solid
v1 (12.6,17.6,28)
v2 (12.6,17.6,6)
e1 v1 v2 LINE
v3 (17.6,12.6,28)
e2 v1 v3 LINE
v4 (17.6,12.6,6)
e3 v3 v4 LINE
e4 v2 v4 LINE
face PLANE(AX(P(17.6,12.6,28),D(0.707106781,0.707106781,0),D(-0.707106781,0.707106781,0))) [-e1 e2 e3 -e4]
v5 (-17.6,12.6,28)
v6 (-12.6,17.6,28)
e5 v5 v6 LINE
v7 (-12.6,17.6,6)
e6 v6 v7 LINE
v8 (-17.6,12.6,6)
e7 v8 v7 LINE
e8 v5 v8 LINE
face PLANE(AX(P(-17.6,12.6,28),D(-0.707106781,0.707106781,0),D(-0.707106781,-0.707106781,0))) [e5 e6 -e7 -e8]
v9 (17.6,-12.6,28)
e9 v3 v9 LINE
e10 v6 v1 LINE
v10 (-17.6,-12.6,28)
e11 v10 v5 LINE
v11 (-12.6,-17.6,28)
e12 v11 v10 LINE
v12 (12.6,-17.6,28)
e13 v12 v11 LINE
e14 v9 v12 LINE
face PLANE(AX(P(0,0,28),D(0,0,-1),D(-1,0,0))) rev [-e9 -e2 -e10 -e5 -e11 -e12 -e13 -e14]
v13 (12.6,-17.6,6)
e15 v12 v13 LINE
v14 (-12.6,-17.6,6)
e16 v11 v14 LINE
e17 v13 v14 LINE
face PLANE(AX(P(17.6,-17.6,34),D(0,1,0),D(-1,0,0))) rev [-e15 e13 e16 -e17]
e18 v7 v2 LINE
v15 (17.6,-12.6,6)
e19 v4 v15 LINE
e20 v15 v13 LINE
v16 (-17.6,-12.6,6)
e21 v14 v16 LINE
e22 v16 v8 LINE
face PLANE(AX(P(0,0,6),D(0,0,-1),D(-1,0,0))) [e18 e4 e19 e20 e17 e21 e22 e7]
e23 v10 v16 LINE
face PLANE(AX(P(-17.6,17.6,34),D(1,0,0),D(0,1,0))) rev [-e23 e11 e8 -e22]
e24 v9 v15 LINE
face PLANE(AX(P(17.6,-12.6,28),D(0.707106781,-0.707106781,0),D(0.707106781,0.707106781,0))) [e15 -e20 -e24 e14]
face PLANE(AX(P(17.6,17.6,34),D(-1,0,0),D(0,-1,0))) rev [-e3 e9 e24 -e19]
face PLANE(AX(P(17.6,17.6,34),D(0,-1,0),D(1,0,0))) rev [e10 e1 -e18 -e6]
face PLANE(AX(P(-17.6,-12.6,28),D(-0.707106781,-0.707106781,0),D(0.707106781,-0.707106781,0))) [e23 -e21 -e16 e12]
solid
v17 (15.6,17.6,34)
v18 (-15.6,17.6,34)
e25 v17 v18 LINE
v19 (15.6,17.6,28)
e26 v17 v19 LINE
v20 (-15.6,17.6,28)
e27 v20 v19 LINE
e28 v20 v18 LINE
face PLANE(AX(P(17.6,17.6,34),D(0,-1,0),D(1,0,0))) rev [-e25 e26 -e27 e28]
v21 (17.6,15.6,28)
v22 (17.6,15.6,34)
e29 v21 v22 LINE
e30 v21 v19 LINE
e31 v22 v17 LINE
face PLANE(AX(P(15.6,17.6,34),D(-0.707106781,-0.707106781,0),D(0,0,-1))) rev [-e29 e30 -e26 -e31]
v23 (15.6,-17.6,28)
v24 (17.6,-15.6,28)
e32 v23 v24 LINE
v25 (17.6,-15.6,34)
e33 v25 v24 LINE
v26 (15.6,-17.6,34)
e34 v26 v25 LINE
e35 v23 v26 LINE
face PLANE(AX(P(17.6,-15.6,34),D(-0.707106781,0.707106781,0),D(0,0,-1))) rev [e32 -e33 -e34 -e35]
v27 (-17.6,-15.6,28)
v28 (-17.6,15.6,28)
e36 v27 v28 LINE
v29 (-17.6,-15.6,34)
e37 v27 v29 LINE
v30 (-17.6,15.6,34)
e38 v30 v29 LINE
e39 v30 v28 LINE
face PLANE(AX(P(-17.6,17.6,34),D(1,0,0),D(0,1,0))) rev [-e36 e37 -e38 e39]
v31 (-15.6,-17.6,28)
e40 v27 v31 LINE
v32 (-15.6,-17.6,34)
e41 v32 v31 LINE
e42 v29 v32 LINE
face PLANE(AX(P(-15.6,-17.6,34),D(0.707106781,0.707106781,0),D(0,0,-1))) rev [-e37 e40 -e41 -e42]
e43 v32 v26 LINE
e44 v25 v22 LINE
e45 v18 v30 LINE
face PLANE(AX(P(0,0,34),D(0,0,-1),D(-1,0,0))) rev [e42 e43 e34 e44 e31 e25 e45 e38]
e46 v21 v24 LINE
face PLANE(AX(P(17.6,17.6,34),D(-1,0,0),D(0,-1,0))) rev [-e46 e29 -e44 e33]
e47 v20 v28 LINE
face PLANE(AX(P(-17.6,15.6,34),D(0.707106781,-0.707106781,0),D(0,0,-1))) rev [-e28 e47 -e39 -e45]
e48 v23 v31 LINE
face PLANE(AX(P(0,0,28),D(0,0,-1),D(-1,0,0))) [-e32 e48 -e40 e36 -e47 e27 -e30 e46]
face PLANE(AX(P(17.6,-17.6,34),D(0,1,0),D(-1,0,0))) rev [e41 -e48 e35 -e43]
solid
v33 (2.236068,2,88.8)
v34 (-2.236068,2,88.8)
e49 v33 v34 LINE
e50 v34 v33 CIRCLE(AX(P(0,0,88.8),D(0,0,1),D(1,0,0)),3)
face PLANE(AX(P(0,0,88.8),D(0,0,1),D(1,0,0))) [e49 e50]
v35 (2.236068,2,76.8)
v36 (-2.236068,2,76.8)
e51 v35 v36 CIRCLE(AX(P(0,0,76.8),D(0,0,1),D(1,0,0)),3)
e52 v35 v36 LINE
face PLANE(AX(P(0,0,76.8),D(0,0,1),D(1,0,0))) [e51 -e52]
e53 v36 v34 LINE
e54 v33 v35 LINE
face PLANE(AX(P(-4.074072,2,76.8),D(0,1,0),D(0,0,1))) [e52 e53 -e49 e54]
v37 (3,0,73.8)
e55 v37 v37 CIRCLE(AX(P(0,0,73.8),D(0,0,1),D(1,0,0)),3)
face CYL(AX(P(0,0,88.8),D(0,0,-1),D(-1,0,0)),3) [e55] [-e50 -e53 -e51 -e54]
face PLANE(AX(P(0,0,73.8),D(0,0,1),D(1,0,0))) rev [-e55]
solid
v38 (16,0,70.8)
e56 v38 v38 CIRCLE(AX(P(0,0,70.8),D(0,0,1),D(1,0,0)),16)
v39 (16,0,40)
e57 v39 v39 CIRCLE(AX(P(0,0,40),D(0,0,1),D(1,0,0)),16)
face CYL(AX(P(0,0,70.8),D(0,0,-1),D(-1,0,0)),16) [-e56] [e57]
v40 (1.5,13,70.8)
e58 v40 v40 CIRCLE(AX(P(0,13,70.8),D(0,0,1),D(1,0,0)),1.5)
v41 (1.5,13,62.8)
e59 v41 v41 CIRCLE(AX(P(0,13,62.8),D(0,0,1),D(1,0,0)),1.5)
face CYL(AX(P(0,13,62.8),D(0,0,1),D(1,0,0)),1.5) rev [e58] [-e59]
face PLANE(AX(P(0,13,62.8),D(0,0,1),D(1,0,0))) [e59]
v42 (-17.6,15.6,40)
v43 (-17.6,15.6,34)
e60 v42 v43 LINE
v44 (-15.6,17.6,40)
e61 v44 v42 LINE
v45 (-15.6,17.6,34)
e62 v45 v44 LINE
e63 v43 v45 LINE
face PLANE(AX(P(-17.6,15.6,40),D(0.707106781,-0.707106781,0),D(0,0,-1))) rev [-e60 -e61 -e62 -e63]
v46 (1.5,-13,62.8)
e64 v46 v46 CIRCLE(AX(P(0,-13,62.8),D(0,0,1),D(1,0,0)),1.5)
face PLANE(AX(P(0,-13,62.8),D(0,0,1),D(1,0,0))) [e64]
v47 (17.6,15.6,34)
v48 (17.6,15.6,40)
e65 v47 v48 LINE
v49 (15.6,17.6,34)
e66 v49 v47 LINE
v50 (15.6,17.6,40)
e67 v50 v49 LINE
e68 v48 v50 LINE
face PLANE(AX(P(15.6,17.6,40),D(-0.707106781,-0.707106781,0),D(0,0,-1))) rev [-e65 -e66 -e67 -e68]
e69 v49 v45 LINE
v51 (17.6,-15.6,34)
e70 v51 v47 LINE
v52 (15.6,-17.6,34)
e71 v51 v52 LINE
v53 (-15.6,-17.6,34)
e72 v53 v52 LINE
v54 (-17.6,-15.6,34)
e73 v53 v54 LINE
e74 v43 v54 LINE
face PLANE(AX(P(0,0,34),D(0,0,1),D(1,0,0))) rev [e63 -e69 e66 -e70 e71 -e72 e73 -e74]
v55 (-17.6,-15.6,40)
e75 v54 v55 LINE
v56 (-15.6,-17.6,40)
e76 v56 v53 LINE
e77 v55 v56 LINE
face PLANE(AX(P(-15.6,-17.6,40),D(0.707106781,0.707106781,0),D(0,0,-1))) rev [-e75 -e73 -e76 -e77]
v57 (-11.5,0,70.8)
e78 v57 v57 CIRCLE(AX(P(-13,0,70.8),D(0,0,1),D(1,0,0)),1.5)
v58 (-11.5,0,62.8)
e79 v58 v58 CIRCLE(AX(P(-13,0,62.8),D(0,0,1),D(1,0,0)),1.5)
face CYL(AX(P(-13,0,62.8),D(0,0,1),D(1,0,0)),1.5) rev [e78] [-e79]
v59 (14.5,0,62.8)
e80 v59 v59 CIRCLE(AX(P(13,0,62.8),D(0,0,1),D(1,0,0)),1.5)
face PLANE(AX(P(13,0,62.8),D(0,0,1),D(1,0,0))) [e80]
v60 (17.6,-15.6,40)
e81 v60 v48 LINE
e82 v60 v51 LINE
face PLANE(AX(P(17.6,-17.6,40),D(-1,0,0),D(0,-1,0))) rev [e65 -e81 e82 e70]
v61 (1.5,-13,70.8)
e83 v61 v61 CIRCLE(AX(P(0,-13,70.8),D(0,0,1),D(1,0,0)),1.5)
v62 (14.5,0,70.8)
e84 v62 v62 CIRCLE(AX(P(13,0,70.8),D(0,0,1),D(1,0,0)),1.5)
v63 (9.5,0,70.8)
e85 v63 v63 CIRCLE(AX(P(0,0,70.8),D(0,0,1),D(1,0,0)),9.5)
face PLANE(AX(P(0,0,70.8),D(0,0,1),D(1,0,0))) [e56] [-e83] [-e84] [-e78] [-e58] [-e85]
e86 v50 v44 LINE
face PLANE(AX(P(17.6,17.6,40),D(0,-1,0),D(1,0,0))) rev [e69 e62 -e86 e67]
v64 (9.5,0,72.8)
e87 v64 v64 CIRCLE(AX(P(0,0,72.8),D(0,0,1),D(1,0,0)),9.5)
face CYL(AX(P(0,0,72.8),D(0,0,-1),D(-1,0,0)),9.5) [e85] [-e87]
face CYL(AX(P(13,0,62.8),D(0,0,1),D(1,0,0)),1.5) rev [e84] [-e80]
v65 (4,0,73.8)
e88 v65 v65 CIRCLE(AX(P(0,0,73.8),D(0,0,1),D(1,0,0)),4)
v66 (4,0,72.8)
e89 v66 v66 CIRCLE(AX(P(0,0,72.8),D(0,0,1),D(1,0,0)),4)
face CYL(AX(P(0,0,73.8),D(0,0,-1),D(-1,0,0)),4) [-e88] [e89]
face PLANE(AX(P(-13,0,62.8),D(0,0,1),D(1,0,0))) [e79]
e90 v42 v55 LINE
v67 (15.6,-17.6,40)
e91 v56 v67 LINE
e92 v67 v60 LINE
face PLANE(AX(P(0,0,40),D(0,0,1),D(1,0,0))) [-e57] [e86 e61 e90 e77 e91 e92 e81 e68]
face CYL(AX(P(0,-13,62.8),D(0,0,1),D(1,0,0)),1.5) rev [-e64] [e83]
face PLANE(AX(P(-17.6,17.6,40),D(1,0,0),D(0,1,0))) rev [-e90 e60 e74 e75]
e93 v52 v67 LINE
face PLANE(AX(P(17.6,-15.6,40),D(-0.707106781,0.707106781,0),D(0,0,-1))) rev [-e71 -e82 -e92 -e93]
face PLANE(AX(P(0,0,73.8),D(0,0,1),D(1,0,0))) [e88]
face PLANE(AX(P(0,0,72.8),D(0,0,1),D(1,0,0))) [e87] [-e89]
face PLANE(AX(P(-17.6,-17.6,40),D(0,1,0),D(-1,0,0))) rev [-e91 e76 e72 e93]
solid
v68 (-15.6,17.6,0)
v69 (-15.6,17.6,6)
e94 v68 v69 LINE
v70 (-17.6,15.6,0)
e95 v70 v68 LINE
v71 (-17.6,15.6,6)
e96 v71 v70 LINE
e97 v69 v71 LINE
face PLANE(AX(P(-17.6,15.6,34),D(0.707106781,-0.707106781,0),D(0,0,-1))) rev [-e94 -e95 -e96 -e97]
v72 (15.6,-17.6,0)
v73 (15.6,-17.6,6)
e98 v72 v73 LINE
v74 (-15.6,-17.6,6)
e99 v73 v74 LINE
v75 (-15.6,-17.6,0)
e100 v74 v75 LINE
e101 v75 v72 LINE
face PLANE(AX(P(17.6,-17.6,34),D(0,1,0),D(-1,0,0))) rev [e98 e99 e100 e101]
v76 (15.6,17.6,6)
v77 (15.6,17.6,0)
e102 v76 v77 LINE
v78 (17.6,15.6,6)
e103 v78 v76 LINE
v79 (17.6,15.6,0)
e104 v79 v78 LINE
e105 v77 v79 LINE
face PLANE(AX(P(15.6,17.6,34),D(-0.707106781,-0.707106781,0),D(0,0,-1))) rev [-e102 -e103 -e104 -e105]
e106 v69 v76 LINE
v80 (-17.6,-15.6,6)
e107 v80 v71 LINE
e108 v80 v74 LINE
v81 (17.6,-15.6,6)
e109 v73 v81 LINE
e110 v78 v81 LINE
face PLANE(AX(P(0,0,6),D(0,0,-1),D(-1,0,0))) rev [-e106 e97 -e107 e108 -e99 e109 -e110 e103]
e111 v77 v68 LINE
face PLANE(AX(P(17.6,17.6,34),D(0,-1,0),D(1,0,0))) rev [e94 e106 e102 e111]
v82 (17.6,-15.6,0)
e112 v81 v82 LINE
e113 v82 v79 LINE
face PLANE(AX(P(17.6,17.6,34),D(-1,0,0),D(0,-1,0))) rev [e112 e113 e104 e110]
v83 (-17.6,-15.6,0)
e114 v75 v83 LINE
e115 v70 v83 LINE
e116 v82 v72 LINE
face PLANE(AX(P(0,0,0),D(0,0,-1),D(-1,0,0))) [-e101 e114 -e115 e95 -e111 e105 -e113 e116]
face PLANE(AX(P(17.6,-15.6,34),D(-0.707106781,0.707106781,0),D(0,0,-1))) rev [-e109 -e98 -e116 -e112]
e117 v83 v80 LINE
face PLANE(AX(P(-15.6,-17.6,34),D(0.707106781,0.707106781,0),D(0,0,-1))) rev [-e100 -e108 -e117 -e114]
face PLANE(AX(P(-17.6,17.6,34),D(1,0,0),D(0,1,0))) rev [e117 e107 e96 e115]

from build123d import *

# Parameters (mm, degrees)
ESQUISSE1_W             = 35.2
ESQUISSE1_H             = 35.2
BOSS_EXTRU_1_DEPTH      = 34
ESQUISSE2_W             = 35.2
ESQUISSE2_H             = 35.2
BOSS_EXTRU_2_DEPTH      = 6
ESQUISSE3_R             = 16
BOSS_EXTRU_3_DEPTH      = 30.8
ESQUISSE4_R             = 9.5
BOSS_EXTRU_4_DEPTH      = 2
ESQUISSE5_R             = 4
BOSS_EXTRU_5_DEPTH      = 1
ESQUISSE6_R             = 3
BOSS_EXTRU_6_DEPTH      = 15
ESQUISSE7_OUTSIDE_W     = 57.56
ESQUISSE7_OUTSIDE_H     = 57.56
ESQUISSE7_OUTSIDE_W_2   = 8.389084627
ESQUISSE7_OUTSIDE_H_2   = 5
ENL_V_MAT_EXTRU_1_DEPTH = 12
ESQUISSE8_R             = 1.5
ENL_V_MAT_EXTRU_2_DEPTH = 8
CHANFREIN1_SIZE         = 2
CHANFREIN2_SIZE         = 2
ESQUISSE9_OUTSIDE_W     = 57.56
ESQUISSE9_OUTSIDE_H     = 57.56
ENL_V_MAT_EXTRU_3_DEPTH = 22


# Read off the part's stored shape, not the designer's step: Intersect1, Intersect2
with BuildPart() as part:
    # Esquisse1 → Boss.-Extru.1 (new body)
    with BuildSketch(Plane.XY):
        Rectangle(ESQUISSE1_W, ESQUISSE1_H)
    extrude(amount=BOSS_EXTRU_1_DEPTH)

    # Chanfrein1
    chanfrein1_edges = [part.edges().sort_by_distance(p)[0] for p in [
        (-17.6, 17.6, 17),
        (17.6, 17.6, 17),
        (17.6, -17.6, 17),
        (-17.6, -17.6, 17),
    ]]
    chamfer(chanfrein1_edges, length=CHANFREIN1_SIZE)

    # Esquisse9 outside → Enlèv. mat.-Extru.3 (cut)
    with BuildSketch(Plane(origin=(0, 0, 6), x_dir=(-1, 0, 0), z_dir=(0, 0, -1))):
        Rectangle(ESQUISSE9_OUTSIDE_W, ESQUISSE9_OUTSIDE_H)
        Polygon((-17.6, -12.6), (-17.6, 12.6), (-12.6, 17.6), (12.6, 17.6), (17.6, 12.6), (17.6, -12.6), (12.6, -17.6), (-12.6, -17.6), align=None, mode=Mode.SUBTRACT)
    extrude(amount=-ENL_V_MAT_EXTRU_3_DEPTH, mode=Mode.SUBTRACT)


with BuildPart() as body_2:
    # Esquisse2 → Boss.-Extru.2 (new body)
    with BuildSketch(Plane.XY.offset(34)):
        Rectangle(ESQUISSE2_W, ESQUISSE2_H)
    extrude(amount=BOSS_EXTRU_2_DEPTH)

    # Esquisse3 → Boss.-Extru.3 (add)
    with BuildSketch(Plane.XY.offset(40)):
        Circle(ESQUISSE3_R)
    extrude(amount=BOSS_EXTRU_3_DEPTH)

    # Esquisse4 → Boss.-Extru.4 (add)
    with BuildSketch(Plane.XY.offset(70.8)):
        Circle(ESQUISSE4_R)
    extrude(amount=BOSS_EXTRU_4_DEPTH)

    # Esquisse5 → Boss.-Extru.5 (add)
    with BuildSketch(Plane.XY.offset(72.8)):
        Circle(ESQUISSE5_R)
    extrude(amount=BOSS_EXTRU_5_DEPTH)

    # Esquisse8 → Enlèv. mat.-Extru.2 (cut)
    with BuildSketch(Plane.XY.offset(70.8)):
        with Locations((0, 13)):
            Circle(ESQUISSE8_R)
        with Locations((13, 0)):
            Circle(ESQUISSE8_R)
        with Locations((0, -13)):
            Circle(ESQUISSE8_R)
        with Locations((-13, 0)):
            Circle(ESQUISSE8_R)
    extrude(amount=-ENL_V_MAT_EXTRU_2_DEPTH, mode=Mode.SUBTRACT)

    # Chanfrein2
    chanfrein2_edges = [body_2.edges().sort_by_distance(p)[0] for p in [
        (17.6, 17.6, 37),
        (17.6, -17.6, 37),
        (-17.6, -17.6, 37),
        (-17.6, 17.6, 37),
    ]]
    chamfer(chanfrein2_edges, length=CHANFREIN2_SIZE)


with BuildPart() as body_3:
    # Esquisse6 → Boss.-Extru.6 (new body)
    with BuildSketch(Plane.XY.offset(73.8)):
        Circle(ESQUISSE6_R)
    extrude(amount=BOSS_EXTRU_6_DEPTH)

    # Esquisse7 outside → Enlèv. mat.-Extru.1 (cut)
    with BuildSketch(Plane.XY.offset(88.8)):
        Rectangle(ESQUISSE7_OUTSIDE_W, ESQUISSE7_OUTSIDE_H)
        with Locations((0.120470513, -0.5)):
            Rectangle(ESQUISSE7_OUTSIDE_W_2, ESQUISSE7_OUTSIDE_H_2, mode=Mode.SUBTRACT)
    extrude(amount=-ENL_V_MAT_EXTRU_1_DEPTH, mode=Mode.SUBTRACT)


with BuildPart() as body_4:
    # Intersect1: the piece on the far side of the plane
    add(part.part)
    split(bisect_by=Plane.XY.offset(28), keep=Keep.BOTTOM)


with BuildPart() as part_1:
    add(part.part)

    # Intersect1
    split(bisect_by=Plane.XY.offset(28), keep=Keep.TOP)


with BuildPart() as body_5:
    # Intersect2: the piece on the far side of the plane
    add(body_4.part)
    split(bisect_by=Plane.XY.offset(6), keep=Keep.BOTTOM)


with BuildPart() as body_4_1:
    add(body_4.part)

    # Intersect2
    split(bisect_by=Plane.XY.offset(6), keep=Keep.TOP)


solid = Compound([body_2.part, body_3.part, part_1.part, body_5.part, body_4_1.part])
